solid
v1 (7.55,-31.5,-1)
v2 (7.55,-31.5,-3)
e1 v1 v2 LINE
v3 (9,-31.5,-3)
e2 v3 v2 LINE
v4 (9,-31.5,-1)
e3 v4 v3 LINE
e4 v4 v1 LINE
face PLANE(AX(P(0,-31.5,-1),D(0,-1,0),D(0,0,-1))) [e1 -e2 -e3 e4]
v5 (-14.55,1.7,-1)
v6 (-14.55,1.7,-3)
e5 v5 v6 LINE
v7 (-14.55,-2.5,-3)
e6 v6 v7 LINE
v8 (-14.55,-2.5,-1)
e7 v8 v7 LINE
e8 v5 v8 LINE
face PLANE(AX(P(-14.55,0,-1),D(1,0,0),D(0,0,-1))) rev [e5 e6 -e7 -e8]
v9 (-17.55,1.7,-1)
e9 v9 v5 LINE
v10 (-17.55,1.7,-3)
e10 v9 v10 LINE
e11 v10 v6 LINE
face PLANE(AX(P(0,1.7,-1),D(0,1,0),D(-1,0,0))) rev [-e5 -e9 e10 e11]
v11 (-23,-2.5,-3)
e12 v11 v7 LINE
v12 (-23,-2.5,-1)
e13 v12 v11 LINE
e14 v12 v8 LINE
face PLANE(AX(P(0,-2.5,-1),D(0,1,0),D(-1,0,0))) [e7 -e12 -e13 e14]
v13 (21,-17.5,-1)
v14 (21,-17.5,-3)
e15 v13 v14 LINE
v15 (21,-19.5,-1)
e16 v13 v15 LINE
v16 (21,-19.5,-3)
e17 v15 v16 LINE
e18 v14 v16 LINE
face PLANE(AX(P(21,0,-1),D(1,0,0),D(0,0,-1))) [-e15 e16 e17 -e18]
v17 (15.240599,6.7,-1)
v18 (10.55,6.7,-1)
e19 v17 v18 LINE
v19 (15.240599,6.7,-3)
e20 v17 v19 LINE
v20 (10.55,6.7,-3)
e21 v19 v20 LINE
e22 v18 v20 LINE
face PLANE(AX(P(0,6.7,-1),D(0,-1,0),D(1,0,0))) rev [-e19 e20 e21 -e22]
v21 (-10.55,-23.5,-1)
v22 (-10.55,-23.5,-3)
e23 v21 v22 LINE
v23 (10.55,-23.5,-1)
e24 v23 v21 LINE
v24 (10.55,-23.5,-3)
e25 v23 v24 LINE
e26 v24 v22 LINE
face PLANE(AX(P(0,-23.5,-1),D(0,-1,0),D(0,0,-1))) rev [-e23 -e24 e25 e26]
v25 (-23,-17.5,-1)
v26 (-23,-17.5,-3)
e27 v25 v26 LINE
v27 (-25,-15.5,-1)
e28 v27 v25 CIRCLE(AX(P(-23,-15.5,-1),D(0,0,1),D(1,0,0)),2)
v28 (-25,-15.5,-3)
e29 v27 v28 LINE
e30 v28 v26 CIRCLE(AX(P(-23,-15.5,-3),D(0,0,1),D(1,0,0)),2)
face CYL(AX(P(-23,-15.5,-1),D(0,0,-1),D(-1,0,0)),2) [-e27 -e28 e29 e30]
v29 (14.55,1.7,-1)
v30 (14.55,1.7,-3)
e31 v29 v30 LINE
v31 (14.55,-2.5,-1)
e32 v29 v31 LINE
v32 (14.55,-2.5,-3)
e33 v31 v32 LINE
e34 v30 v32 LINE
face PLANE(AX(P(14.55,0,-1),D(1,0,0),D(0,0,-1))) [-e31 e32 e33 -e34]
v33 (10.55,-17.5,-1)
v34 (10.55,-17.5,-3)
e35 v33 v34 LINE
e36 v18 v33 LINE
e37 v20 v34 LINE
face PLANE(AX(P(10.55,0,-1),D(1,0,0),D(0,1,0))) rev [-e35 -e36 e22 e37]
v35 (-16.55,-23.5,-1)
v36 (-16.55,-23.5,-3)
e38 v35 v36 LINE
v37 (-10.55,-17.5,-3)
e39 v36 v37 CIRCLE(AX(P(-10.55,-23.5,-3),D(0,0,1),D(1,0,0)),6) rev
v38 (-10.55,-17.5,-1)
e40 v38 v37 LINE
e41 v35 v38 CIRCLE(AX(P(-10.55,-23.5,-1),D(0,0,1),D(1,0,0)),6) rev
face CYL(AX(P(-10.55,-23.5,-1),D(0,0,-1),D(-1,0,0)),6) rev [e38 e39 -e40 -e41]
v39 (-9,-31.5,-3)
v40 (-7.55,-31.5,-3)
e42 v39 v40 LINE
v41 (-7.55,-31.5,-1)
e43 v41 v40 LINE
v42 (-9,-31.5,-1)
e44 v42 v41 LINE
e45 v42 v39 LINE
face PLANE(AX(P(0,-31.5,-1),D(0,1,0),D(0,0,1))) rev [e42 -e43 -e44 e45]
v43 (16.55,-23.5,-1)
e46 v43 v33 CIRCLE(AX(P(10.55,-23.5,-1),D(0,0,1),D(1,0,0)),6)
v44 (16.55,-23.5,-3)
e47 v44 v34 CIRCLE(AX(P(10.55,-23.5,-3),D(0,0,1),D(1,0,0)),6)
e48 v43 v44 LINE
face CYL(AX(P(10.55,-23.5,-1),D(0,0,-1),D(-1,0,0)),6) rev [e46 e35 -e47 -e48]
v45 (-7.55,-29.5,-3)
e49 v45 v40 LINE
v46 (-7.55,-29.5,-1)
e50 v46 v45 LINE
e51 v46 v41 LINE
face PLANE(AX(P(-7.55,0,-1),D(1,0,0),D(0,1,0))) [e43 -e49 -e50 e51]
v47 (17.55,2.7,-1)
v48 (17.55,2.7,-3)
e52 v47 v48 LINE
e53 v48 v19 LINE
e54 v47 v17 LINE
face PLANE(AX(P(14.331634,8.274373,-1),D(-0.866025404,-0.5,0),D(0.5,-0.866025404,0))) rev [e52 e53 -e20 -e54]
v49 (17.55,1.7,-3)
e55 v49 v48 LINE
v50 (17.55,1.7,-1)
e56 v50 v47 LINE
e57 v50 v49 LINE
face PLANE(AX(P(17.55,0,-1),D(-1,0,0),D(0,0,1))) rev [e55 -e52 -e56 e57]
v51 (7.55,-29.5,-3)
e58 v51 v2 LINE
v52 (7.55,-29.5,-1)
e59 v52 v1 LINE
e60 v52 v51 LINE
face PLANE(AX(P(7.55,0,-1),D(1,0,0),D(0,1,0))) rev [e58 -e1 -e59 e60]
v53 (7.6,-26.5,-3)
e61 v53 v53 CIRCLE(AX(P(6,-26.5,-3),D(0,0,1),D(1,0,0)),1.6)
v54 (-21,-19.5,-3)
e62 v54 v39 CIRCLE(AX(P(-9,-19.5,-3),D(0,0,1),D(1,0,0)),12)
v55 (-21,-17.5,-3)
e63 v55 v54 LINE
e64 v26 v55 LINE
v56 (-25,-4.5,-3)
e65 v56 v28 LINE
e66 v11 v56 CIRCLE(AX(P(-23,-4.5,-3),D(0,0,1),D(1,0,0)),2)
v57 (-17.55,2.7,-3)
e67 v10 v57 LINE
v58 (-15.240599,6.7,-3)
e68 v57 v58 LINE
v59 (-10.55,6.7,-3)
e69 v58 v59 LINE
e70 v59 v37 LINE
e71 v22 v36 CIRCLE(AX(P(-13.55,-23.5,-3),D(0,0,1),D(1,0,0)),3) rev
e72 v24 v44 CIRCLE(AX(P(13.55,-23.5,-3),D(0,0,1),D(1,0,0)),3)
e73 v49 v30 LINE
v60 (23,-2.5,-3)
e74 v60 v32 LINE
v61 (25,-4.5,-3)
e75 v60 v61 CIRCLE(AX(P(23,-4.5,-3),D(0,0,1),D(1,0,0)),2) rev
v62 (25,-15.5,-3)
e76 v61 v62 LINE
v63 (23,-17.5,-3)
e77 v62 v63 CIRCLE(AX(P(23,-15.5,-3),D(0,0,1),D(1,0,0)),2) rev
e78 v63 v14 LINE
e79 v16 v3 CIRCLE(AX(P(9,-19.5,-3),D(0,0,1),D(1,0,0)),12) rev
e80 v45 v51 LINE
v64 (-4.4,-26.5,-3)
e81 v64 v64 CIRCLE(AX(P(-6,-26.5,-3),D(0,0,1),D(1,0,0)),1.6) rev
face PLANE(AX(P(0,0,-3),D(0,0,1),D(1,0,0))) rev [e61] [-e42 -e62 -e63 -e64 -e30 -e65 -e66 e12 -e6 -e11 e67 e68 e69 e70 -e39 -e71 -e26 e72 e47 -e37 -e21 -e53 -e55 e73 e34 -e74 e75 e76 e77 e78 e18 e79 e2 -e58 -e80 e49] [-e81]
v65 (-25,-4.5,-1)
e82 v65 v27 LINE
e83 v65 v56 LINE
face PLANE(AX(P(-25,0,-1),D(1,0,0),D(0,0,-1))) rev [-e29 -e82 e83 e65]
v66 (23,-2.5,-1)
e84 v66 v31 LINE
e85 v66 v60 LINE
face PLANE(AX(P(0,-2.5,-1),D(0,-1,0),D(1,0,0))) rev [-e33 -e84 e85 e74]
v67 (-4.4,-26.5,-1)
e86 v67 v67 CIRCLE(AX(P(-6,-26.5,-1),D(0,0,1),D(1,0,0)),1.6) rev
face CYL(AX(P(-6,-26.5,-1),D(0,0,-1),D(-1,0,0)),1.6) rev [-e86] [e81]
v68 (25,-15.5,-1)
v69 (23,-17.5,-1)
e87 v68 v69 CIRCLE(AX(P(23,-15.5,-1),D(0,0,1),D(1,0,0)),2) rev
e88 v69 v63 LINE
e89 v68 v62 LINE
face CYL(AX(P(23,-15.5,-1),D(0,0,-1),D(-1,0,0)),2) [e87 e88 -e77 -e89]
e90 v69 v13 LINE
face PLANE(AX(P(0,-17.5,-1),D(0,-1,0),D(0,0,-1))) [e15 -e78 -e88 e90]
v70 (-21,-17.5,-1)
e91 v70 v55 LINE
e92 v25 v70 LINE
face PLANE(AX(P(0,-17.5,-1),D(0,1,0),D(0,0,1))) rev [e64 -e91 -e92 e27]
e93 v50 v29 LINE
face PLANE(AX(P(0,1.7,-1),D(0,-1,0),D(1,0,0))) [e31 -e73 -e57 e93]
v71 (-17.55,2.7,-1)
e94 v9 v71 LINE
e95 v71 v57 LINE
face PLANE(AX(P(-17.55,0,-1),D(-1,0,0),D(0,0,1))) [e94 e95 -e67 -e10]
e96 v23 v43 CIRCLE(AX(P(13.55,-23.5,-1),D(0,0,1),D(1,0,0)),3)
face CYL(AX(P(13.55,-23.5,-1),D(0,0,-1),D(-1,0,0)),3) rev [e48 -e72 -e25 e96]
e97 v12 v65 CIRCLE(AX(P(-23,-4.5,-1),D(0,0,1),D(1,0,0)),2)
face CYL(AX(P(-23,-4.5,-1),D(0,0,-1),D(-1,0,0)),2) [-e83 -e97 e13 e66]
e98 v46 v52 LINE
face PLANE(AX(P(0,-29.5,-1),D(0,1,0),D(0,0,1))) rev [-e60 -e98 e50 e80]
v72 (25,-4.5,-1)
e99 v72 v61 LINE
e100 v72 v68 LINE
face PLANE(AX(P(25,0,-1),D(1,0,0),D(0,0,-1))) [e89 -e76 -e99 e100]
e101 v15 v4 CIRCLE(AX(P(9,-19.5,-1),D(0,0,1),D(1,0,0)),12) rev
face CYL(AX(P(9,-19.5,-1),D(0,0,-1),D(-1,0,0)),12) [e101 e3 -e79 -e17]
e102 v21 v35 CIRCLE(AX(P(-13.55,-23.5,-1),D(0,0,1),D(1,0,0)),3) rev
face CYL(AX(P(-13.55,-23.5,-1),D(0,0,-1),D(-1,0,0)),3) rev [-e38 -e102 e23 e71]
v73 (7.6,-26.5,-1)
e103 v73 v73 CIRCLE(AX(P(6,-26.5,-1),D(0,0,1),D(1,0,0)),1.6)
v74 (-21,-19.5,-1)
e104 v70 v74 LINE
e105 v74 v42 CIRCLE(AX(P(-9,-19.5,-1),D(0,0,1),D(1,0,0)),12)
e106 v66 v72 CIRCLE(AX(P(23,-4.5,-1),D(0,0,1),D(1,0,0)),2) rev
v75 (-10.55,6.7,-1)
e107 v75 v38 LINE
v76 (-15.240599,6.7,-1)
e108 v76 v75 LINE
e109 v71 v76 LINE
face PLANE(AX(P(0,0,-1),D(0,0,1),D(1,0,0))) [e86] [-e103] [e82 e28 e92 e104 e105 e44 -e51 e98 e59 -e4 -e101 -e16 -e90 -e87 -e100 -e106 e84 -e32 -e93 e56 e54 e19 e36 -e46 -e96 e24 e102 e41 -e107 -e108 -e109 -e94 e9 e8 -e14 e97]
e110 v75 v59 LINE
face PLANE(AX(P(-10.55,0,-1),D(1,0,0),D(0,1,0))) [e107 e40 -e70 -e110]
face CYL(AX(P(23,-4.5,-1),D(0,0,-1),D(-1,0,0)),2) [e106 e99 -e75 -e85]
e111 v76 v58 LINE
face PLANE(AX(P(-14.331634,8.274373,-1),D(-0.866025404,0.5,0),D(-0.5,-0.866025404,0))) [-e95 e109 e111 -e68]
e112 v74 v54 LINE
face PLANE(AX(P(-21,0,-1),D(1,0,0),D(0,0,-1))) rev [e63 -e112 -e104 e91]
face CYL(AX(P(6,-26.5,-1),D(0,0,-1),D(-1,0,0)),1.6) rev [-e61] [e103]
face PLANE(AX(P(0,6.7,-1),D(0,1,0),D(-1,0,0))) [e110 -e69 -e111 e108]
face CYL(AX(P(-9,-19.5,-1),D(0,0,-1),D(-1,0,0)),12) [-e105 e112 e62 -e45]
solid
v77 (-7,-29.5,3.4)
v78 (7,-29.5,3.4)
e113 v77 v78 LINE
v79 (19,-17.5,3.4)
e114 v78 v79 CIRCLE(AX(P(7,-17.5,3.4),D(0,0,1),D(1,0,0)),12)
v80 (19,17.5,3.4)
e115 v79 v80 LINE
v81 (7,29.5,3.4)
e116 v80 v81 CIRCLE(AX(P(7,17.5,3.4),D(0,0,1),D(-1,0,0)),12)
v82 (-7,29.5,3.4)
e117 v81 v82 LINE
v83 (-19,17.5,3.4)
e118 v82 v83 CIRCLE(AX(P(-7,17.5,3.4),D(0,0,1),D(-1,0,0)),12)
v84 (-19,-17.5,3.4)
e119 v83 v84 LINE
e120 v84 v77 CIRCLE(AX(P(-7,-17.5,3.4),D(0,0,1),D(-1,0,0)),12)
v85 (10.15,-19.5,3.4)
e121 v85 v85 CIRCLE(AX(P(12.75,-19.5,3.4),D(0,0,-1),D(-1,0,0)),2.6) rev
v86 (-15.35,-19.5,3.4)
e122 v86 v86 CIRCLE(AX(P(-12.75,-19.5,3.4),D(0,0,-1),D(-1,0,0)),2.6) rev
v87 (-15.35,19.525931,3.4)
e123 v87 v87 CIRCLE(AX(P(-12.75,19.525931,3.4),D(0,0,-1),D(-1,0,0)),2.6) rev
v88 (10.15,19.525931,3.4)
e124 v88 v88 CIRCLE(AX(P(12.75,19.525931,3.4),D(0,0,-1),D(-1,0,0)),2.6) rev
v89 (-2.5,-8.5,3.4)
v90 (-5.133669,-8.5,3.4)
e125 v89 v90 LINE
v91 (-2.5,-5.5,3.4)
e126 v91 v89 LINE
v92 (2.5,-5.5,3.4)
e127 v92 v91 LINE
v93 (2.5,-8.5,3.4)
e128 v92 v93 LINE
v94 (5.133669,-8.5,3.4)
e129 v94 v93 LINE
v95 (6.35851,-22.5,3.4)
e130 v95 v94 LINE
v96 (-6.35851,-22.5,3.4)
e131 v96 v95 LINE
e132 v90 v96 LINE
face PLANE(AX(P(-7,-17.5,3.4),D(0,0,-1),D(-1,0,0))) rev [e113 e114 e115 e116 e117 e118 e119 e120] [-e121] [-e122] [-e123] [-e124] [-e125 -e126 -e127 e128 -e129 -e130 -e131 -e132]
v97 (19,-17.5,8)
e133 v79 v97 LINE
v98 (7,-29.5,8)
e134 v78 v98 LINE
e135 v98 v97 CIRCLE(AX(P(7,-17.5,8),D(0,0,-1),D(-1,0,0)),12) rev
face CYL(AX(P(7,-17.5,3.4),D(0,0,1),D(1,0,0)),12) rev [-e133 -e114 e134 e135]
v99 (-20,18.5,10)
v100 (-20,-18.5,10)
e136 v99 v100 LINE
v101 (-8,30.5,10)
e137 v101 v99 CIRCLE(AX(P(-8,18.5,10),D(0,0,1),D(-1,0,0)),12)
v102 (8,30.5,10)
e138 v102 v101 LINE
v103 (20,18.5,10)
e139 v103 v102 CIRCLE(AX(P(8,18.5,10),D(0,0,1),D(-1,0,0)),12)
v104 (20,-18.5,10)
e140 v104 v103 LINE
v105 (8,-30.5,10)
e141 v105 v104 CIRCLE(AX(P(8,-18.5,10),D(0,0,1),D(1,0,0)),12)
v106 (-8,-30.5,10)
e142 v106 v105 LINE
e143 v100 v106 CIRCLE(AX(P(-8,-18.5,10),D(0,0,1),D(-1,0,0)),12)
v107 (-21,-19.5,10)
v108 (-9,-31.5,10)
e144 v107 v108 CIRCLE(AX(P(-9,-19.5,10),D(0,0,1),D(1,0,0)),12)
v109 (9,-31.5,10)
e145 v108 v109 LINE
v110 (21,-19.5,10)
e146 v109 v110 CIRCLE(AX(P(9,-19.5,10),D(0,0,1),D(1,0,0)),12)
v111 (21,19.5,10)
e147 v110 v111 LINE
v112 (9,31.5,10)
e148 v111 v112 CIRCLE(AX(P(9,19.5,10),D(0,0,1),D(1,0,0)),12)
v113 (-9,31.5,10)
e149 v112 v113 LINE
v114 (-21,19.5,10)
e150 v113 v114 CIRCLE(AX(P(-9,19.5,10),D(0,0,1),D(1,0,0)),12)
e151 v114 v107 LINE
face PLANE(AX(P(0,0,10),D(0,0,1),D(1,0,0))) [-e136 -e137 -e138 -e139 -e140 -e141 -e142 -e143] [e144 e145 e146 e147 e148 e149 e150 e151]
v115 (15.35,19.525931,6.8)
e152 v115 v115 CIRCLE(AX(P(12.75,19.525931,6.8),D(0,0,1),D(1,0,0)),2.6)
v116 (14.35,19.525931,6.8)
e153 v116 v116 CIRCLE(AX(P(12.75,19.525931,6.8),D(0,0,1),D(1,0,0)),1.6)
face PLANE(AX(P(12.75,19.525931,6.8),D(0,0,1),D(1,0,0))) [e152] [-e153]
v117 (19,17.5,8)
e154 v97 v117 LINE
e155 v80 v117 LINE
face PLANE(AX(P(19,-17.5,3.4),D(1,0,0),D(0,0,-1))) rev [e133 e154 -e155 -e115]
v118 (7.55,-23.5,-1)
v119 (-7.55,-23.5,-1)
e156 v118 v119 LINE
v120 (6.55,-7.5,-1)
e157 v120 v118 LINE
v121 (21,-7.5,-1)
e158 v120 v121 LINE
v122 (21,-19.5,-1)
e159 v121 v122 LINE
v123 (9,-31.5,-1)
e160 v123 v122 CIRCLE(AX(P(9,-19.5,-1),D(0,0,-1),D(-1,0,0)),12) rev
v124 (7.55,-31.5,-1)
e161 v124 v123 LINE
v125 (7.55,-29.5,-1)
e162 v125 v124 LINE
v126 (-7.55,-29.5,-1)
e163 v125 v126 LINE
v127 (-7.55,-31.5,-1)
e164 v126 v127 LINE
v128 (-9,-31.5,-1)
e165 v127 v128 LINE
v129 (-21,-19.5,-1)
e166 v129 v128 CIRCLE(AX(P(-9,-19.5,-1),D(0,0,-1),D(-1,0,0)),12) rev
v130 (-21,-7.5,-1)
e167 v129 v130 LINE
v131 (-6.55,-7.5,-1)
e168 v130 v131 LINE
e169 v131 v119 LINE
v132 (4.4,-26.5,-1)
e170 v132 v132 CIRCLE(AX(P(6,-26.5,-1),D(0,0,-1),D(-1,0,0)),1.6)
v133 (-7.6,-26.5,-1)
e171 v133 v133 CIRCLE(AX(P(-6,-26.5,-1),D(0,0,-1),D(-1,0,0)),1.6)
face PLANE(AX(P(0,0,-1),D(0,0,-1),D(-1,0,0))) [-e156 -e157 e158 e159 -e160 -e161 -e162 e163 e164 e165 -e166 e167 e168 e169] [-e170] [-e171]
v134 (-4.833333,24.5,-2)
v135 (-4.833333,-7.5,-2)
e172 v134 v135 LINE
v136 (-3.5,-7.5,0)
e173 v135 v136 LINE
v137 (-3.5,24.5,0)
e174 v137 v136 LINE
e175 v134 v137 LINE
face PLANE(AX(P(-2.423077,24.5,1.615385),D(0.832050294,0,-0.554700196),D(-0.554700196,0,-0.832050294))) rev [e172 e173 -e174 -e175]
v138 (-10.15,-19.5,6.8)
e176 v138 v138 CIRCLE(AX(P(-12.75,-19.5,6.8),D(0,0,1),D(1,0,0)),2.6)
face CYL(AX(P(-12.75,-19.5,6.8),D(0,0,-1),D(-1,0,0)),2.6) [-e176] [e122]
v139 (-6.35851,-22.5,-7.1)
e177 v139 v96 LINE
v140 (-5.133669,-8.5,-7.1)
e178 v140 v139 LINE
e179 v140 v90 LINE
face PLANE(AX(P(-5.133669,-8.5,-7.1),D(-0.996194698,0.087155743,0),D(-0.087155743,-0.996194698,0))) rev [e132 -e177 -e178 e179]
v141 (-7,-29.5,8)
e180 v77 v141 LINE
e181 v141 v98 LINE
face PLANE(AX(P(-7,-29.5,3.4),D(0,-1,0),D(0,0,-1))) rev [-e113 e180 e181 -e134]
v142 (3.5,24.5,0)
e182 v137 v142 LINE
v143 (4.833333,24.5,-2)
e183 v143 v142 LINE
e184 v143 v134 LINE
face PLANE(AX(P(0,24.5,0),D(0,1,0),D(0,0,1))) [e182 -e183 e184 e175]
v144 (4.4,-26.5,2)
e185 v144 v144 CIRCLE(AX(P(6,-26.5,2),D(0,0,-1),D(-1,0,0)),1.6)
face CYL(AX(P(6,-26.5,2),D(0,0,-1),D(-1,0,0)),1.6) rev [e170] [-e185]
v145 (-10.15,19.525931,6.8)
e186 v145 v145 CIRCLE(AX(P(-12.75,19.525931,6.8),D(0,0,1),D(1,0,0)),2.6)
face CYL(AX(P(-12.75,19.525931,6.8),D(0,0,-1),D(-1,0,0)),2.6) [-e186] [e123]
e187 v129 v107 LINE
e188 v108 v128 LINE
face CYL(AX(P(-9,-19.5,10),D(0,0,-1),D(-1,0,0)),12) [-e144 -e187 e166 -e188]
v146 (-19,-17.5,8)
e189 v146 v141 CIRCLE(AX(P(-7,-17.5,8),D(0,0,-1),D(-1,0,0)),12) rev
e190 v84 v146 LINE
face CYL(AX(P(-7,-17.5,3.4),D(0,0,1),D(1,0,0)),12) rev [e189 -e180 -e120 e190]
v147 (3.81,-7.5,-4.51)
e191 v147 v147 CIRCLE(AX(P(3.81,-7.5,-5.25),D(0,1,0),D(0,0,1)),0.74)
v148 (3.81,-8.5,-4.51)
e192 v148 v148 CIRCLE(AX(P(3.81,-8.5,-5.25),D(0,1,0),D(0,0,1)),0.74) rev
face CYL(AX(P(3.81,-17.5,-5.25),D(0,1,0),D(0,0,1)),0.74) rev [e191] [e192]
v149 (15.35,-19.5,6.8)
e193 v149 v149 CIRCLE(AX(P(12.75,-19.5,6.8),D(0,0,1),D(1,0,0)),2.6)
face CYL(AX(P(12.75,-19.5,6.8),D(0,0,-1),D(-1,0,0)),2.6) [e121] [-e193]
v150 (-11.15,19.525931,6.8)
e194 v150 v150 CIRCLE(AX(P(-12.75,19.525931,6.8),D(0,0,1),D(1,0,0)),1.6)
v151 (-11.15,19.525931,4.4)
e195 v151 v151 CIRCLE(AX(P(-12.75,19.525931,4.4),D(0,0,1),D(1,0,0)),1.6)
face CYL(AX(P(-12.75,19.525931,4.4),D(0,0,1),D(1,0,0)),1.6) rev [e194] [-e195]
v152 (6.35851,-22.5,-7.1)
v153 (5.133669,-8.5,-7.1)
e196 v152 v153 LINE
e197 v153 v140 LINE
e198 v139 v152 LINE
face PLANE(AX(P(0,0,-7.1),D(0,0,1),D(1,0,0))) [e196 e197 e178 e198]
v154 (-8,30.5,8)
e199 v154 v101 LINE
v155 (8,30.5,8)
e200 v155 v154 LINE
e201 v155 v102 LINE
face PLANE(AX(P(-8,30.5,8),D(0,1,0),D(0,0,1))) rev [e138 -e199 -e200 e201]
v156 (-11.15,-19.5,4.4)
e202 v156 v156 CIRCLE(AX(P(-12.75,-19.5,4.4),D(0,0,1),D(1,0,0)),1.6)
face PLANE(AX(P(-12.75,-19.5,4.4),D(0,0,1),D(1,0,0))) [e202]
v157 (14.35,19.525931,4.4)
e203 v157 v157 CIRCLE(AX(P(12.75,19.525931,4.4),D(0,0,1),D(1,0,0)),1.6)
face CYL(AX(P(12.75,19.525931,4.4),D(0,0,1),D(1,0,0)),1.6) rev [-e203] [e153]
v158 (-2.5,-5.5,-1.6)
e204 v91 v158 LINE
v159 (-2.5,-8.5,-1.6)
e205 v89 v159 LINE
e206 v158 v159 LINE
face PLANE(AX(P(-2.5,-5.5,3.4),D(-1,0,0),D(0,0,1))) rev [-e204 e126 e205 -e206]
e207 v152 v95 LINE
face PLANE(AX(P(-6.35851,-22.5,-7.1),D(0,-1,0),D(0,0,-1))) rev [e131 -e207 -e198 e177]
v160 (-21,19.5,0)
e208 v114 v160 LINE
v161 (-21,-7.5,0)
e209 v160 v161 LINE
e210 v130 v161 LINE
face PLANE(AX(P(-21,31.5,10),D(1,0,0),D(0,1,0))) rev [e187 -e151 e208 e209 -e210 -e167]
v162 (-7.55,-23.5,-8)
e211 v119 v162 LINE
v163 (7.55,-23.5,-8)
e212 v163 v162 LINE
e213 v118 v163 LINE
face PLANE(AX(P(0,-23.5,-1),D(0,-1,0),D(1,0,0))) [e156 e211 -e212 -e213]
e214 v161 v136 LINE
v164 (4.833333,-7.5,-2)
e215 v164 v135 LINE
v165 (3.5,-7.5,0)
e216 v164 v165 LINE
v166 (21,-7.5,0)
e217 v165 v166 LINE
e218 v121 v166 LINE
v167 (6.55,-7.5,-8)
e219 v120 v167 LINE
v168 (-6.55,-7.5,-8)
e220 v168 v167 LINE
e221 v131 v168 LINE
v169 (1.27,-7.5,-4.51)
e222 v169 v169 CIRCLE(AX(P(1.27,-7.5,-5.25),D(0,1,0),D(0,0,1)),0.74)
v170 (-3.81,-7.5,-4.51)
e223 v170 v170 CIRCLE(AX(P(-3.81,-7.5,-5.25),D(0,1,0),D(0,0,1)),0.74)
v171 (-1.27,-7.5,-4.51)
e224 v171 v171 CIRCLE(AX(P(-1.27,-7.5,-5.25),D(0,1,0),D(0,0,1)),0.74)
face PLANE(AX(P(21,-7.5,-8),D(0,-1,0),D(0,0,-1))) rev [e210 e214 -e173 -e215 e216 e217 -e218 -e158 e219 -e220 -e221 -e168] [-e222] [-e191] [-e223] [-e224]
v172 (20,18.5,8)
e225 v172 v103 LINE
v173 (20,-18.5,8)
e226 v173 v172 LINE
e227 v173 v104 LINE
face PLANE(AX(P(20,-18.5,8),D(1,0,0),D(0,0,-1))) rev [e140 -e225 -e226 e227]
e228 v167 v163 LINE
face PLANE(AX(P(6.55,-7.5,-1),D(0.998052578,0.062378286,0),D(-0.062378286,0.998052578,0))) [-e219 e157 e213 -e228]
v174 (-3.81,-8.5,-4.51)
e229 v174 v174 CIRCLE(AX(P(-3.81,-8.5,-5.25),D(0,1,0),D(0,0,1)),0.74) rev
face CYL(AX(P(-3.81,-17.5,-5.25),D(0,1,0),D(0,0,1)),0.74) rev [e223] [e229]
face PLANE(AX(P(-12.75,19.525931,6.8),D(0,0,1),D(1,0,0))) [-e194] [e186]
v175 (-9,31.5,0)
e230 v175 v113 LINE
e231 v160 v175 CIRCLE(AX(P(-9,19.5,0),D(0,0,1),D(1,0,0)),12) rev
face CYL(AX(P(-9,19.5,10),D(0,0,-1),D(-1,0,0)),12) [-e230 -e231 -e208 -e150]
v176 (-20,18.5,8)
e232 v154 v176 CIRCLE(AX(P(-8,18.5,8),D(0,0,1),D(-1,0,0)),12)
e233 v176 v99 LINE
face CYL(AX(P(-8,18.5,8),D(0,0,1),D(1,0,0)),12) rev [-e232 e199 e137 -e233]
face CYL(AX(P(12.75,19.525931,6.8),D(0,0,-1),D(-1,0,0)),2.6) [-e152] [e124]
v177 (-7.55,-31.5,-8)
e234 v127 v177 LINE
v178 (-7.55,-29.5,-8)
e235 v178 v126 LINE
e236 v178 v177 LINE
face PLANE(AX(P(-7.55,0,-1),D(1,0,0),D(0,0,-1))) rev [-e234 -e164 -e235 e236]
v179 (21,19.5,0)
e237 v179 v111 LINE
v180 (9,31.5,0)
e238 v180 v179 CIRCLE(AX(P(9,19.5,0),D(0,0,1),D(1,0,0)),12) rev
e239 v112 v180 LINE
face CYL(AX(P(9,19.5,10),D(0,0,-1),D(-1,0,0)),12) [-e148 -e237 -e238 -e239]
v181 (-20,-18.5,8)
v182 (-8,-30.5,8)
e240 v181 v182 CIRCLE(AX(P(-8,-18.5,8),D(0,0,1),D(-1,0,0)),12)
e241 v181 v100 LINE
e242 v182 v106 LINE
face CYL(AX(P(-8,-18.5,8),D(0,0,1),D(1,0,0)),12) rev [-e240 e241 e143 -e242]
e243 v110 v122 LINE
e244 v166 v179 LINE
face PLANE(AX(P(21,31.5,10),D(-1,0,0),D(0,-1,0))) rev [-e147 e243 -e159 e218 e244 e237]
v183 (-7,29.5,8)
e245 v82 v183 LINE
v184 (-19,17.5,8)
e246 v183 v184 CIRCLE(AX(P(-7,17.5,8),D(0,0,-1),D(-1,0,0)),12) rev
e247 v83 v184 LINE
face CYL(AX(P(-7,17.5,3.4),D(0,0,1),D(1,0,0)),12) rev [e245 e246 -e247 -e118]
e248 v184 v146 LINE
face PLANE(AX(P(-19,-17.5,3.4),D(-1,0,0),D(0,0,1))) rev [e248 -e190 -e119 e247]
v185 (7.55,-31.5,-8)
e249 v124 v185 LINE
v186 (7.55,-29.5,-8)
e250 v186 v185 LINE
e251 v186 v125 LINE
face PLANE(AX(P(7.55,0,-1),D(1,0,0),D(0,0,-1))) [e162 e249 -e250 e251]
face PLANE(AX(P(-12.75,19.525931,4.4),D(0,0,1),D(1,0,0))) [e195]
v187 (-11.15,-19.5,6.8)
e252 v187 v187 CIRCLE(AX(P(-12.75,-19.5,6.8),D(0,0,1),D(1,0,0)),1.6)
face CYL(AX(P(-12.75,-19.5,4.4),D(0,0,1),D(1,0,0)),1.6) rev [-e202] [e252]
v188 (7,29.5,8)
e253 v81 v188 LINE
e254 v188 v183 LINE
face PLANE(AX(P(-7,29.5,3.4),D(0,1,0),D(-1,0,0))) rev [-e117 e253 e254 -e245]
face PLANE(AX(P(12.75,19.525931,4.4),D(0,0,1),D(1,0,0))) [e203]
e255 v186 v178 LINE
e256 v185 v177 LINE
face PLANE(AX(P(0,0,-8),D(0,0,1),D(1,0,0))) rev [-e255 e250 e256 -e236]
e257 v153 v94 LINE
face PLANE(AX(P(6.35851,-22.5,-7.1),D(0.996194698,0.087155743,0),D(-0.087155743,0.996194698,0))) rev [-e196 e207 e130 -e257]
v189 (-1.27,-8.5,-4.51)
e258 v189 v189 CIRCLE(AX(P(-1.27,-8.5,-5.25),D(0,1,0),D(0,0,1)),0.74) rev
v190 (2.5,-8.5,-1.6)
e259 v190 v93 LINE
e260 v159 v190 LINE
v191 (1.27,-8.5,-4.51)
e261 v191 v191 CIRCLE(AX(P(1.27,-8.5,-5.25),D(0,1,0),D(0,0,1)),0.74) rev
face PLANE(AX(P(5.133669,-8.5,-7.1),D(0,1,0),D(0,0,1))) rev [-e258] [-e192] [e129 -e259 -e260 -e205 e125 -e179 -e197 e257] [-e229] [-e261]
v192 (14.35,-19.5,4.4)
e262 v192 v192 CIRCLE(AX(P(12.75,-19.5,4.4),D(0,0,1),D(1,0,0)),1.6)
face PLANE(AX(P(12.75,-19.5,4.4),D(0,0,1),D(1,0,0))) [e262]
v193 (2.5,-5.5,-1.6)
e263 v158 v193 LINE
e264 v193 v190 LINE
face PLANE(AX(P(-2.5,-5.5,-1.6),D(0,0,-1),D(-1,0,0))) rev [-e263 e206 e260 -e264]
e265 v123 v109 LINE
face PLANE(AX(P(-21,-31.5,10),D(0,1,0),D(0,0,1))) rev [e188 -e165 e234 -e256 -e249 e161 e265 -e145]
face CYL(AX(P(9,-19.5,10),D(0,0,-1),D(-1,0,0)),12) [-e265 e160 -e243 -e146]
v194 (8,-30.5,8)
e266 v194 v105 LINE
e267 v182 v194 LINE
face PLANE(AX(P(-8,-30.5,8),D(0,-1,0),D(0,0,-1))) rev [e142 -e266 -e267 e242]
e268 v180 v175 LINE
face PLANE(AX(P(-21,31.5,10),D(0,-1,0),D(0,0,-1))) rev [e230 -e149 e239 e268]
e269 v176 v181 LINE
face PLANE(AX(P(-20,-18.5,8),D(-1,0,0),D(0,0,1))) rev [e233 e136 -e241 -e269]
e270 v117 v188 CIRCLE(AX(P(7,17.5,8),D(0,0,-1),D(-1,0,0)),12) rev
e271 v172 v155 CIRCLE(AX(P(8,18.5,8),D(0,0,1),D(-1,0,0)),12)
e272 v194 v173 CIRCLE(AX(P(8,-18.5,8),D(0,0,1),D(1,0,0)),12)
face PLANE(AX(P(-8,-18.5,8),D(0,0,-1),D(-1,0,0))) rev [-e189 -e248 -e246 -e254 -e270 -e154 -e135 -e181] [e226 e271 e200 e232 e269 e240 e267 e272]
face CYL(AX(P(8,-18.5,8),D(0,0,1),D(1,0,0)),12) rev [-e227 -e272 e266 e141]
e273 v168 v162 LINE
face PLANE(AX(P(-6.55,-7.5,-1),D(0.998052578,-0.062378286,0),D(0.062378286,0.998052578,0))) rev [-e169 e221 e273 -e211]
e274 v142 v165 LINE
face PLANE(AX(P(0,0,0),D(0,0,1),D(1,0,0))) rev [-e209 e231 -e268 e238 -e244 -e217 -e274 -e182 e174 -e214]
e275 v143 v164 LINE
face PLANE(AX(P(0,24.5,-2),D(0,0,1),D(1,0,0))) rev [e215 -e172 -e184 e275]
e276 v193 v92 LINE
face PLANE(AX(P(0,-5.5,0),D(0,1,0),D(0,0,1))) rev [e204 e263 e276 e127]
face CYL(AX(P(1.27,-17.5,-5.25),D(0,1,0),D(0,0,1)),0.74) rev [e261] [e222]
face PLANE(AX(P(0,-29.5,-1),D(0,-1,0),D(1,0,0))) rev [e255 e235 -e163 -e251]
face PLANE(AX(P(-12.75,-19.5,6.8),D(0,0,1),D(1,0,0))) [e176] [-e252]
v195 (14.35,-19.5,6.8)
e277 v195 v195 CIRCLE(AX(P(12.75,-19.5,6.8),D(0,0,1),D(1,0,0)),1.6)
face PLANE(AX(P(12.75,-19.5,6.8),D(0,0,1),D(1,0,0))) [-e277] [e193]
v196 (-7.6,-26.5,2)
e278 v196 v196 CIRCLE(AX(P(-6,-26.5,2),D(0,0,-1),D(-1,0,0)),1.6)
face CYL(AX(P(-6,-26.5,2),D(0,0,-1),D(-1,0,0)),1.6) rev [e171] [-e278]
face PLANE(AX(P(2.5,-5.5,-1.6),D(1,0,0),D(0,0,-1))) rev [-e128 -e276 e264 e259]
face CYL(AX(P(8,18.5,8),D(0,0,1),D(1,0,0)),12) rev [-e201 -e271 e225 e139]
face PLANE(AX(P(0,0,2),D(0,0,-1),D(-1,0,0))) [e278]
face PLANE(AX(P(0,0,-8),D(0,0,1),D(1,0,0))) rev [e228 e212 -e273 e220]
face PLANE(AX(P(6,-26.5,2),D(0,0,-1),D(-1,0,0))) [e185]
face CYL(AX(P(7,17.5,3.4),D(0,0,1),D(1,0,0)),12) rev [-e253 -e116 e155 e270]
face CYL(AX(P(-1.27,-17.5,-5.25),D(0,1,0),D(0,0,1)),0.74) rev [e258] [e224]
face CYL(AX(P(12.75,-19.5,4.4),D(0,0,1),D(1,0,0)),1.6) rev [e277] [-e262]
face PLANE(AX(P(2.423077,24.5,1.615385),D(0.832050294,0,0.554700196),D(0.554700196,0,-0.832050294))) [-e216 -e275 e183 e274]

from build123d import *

# Parameters (mm, degrees)
SKETCH_2_W           = 42
SKETCH_2_H           = 63
EXTRUDE_1_DEPTH      = 10
SKETCH_3_W           = 42
SKETCH_3_H           = 24
EXTRUDE_2_DEPTH      = 8
EXTRUDE_3_DEPTH      = 32
SKETCH_5_R           = 0.74
CUT_EXTRUDE_1_DEPTH  = 10
CUT_EXTRUDE_2_DEPTH  = 7
SKETCH_8_R           = 1.6
CUT_EXTRUDE_4_DEPTH  = 3
FILLET_6_R           = 12
CUT_EXTRUDE_21_DEPTH = 7
EXTRUDE_START        = -3
SKETCH_10_R          = 1.6
EXTRUDE_9977_DEPTH   = 2
CUT_EXTRUDE_5_DEPTH  = 6.6
CUT_EXTRUDE_6_DEPTH  = 2
SKETCH_29_R          = 2.6
EXTRUDE_12_DEPTH     = 3.4
SKETCH_32_R          = 1.6
CUT_EXTRUDE_16_DEPTH = 2.4
CUT_EXTRUDE_17_DEPTH = 10.5
SKETCH_38_W          = 5
SKETCH_38_H          = 5
CUT_EXTRUDE_19_DEPTH = 3


with BuildPart() as part:
    # 草图2 → 凸台-拉伸1 (new body)
    with BuildSketch(Plane.XY):
        Rectangle(SKETCH_2_W, SKETCH_2_H)
    extrude(amount=EXTRUDE_1_DEPTH)

    # 草图3 → 凸台-拉伸2 (add)
    with BuildSketch(Plane(origin=(0, 0, 0), x_dir=(-1, 0, 0), z_dir=(0, 0, -1))):
        with Locations((0, -19.5)):
            Rectangle(SKETCH_3_W, SKETCH_3_H)
    extrude(amount=EXTRUDE_2_DEPTH)

    # 草图4 → 凸台-拉伸3 (add)
    with BuildSketch(Plane(origin=(0, -7.5, 0), x_dir=(1, 0, 0), z_dir=(0, 1, 0))):
        Polygon((3.5, 0), (4.833333333, 2), (-4.833333333, 2), (-3.5, 0), align=None)
    extrude(amount=EXTRUDE_3_DEPTH)

    # 草图5 → 切除-拉伸1 (cut)
    with BuildSketch(Plane(origin=(0, -7.5, 0), x_dir=(1, 0, 0), z_dir=(0, 1, 0))):
        with Locations(Location((-3.81, 5.25, 0), (0, 0, 270))):
            Circle(SKETCH_5_R)
        with Locations(Location((-1.27, 5.25, 0), (0, 0, 270))):
            Circle(SKETCH_5_R)
        with Locations(Location((1.27, 5.25, 0), (0, 0, 270))):
            Circle(SKETCH_5_R)
        with Locations(Location((3.81, 5.25, 0), (0, 0, 270))):
            Circle(SKETCH_5_R)
    extrude(amount=-CUT_EXTRUDE_1_DEPTH, mode=Mode.SUBTRACT)

    # 草图6 → 切除-拉伸2 (cut)
    with BuildSketch(Plane(origin=(0, 0, -8), x_dir=(-1, 0, 0), z_dir=(0, 0, -1))):
        with BuildLine():
            Line((-9.55, -7.5), (-21, -7.5))
            Line((-21, -7.5), (-21, -17.5))
            Line((-21, -17.5), (-19, -17.5))
            Line((-19, -17.5), (-19, -21.5))
            ThreePointArc((-19, -21.5), (-16.656854249, -27.156854249), (-11, -29.5))
            Line((-11, -29.5), (11, -29.5))
            ThreePointArc((11, -29.5), (16.656854249, -27.156854249), (19, -21.5))
            Line((19, -21.5), (19, -17.5))
            Line((19, -17.5), (21, -17.5))
            Line((21, -17.5), (21, -7.5))
            Line((21, -7.5), (9.55, -7.5))
            Line((9.55, -7.5), (9.55, -19.5))
            ThreePointArc((9.55, -19.5), (12.378427125, -20.671572875), (13.55, -23.5))
            ThreePointArc((13.55, -23.5), (11.55, -25.5), (9.55, -23.5))
            Line((9.55, -23.5), (-9.55, -23.5))
            ThreePointArc((-9.55, -23.5), (-11.55, -25.5), (-13.55, -23.5))
            ThreePointArc((-13.55, -23.5), (-12.378427125, -20.671572875), (-9.55, -19.5))
            Line((-9.55, -19.5), (-9.55, -7.5))
        make_face()
    extrude(amount=-CUT_EXTRUDE_2_DEPTH, mode=Mode.SUBTRACT)

    # 草图8 → 切除-拉伸4 (cut)
    with BuildSketch(Plane(origin=(0, 0, -1), x_dir=(-1, 0, 0), z_dir=(0, 0, -1))):
        with Locations((-6, -26.5)):
            Circle(SKETCH_8_R)
        with Locations((6, -26.5)):
            Circle(SKETCH_8_R)
    extrude(amount=-CUT_EXTRUDE_4_DEPTH, mode=Mode.SUBTRACT)

    # 圆角6
    fillet_6_edges = [part.edges().sort_by_distance(p)[0] for p in [
        (21, -31.5, 1),
        (-21, -31.5, 1),
        (-21, 31.5, 5),
        (21, 31.5, 5),
    ]]
    fillet(fillet_6_edges, radius=FILLET_6_R)

    # 草图43 → 切除-拉伸21 (cut)
    with BuildSketch(Plane(origin=(0, 0, -8), x_dir=(-1, 0, 0), z_dir=(0, 0, -1))):
        Polygon((-7.55, -7.5), (-21, -7.5), (-21, -31.5), (-7.55, -31.5), (-7.55, -23.5), (-6.55, -7.5), align=None)
        Polygon((21, -7.5), (21, -31.5), (7.55, -31.5), (7.55, -23.5), (6.55, -7.5), (7.55, -7.5), align=None)
    extrude(amount=-CUT_EXTRUDE_21_DEPTH, mode=Mode.SUBTRACT)

    # 草图14 → 切除-拉伸5 (cut)
    with BuildSketch(Plane.XY.offset(10)):
        with BuildLine():
            Line((-7, -29.5), (7, -29.5))
            ThreePointArc((7, -29.5), (15.485281374, -25.985281374), (19, -17.5))
            Line((19, -17.5), (19, 17.5))
            ThreePointArc((19, 17.5), (15.485281374, 25.985281374), (7, 29.5))
            Line((7, 29.5), (-7, 29.5))
            ThreePointArc((-7, 29.5), (-15.485281374, 25.985281374), (-19, 17.5))
            Line((-19, 17.5), (-19, -17.5))
            ThreePointArc((-19, -17.5), (-15.485281374, -25.985281374), (-7, -29.5))
        make_face()
    extrude(amount=-CUT_EXTRUDE_5_DEPTH, mode=Mode.SUBTRACT)

    # 草图15 → 切除-拉伸6 (cut)
    with BuildSketch(Plane.XY.offset(10)):
        with BuildLine():
            Line((-8, -30.5), (8, -30.5))
            ThreePointArc((8, -30.5), (16.485281374, -26.985281374), (20, -18.5))
            Line((20, -18.5), (20, 18.5))
            ThreePointArc((20, 18.5), (16.485281374, 26.985281374), (8, 30.5))
            Line((8, 30.5), (-8, 30.5))
            ThreePointArc((-8, 30.5), (-16.485281374, 26.985281374), (-20, 18.5))
            Line((-20, 18.5), (-20, -18.5))
            ThreePointArc((-20, -18.5), (-16.485281374, -26.985281374), (-8, -30.5))
        make_face()
    extrude(amount=-CUT_EXTRUDE_6_DEPTH, mode=Mode.SUBTRACT)

    # 草图29 → 凸台-拉伸12 (add)
    with BuildSketch(Plane.XY.offset(3.4)):
        with Locations(Location((12.75, 19.525931249, 0), (0, 0, 180))):
            Circle(SKETCH_29_R)
        with Locations(Location((-12.75, 19.525931249, 0), (0, 0, 180))):
            Circle(SKETCH_29_R)
        with Locations(Location((-12.75, -19.5, 0), (0, 0, 180))):
            Circle(SKETCH_29_R)
        with Locations(Location((12.75, -19.5, 0), (0, 0, 180))):
            Circle(SKETCH_29_R)
    extrude(amount=EXTRUDE_12_DEPTH)

    # 草图32 → 切除-拉伸16 (cut)
    with BuildSketch(Plane.XY.offset(6.8)):
        with Locations((-12.75, 19.525931249)):
            Circle(SKETCH_32_R)
        with Locations((12.75, 19.525931249)):
            Circle(SKETCH_32_R)
        with Locations((12.75, -19.5)):
            Circle(SKETCH_32_R)
        with Locations((-12.75, -19.5)):
            Circle(SKETCH_32_R)
    extrude(amount=-CUT_EXTRUDE_16_DEPTH, mode=Mode.SUBTRACT)

    # 草图36 → 切除-拉伸17 (cut)
    with BuildSketch(Plane.XY.offset(3.4)):
        Polygon((6.358510115, -22.5), (5.133668826, -8.5), (-5.133668826, -8.5), (-6.358510115, -22.5), align=None)
    extrude(amount=-CUT_EXTRUDE_17_DEPTH, mode=Mode.SUBTRACT)

    # 草图38 → 切除-拉伸19 (cut)
    with BuildSketch(Plane(origin=(0, -8.5, 0), x_dir=(-1, 0, 0), z_dir=(0, -1, 0))):
        with Locations((0, -0.9)):
            Rectangle(SKETCH_38_W, SKETCH_38_H)
    extrude(amount=-CUT_EXTRUDE_19_DEPTH, mode=Mode.SUBTRACT)


with BuildPart() as body_2:
    # 草图10 → Extrude 9977 (new body)
    with BuildSketch(Plane.XY.offset(EXTRUDE_START)):
        with BuildLine():
            Line((23, -2.5), (14.55, -2.5))
            Line((14.55, -2.5), (14.55, 1.7))
            Line((14.55, 1.7), (17.55, 1.7))
            Line((17.55, 1.7), (17.55, 2.7))
            Line((17.55, 2.7), (15.240598923, 6.7))
            Line((15.240598923, 6.7), (10.55, 6.7))
            Line((10.55, 6.7), (10.55, -17.5))
            ThreePointArc((10.55, -17.5), (14.792640687, -19.257359313), (16.55, -23.5))
            ThreePointArc((16.55, -23.5), (13.55, -26.5), (10.55, -23.5))
            Line((10.55, -23.5), (-10.55, -23.5))
            ThreePointArc((-10.55, -23.5), (-13.55, -26.5), (-16.55, -23.5))
            ThreePointArc((-16.55, -23.5), (-14.792640687, -19.257359313), (-10.55, -17.5))
            Line((-10.55, -17.5), (-10.55, 6.7))
            Line((-10.55, 6.7), (-15.240598923, 6.7))
            Line((-15.240598923, 6.7), (-17.55, 2.7))
            Line((-17.55, 2.7), (-17.55, 1.7))
            Line((-17.55, 1.7), (-14.55, 1.7))
            Line((-14.55, 1.7), (-14.55, -2.5))
            Line((-14.55, -2.5), (-23, -2.5))
            ThreePointArc((-23, -2.5), (-24.414213562, -3.085786438), (-25, -4.5))
            Line((-25, -4.5), (-25, -15.5))
            ThreePointArc((-25, -15.5), (-24.414213562, -16.914213562), (-23, -17.5))
            Line((-23, -17.5), (-21, -17.5))
            Line((-21, -17.5), (-21, -19.5))
            ThreePointArc((-21, -19.5), (-17.485281374, -27.985281374), (-9, -31.5))
            Line((-9, -31.5), (-7.55, -31.5))
            Line((-7.55, -31.5), (-7.55, -29.5))
            Line((-7.55, -29.5), (7.55, -29.5))
            Line((7.55, -29.5), (7.55, -31.5))
            Line((7.55, -31.5), (9, -31.5))
            ThreePointArc((9, -31.5), (17.485281374, -27.985281374), (21, -19.5))
            Line((21, -19.5), (21, -17.5))
            Line((21, -17.5), (23, -17.5))
            ThreePointArc((23, -17.5), (24.414213562, -16.914213562), (25, -15.5))
            Line((25, -15.5), (25, -4.5))
            ThreePointArc((25, -4.5), (24.414213562, -3.085786438), (23, -2.5))
        make_face()
        with Locations((6, -26.5)):
            Circle(SKETCH_10_R, mode=Mode.SUBTRACT)
        with Locations((-6, -26.5)):
            Circle(SKETCH_10_R, mode=Mode.SUBTRACT)
    extrude(amount=EXTRUDE_9977_DEPTH)


solid = Compound([part.part, body_2.part])
